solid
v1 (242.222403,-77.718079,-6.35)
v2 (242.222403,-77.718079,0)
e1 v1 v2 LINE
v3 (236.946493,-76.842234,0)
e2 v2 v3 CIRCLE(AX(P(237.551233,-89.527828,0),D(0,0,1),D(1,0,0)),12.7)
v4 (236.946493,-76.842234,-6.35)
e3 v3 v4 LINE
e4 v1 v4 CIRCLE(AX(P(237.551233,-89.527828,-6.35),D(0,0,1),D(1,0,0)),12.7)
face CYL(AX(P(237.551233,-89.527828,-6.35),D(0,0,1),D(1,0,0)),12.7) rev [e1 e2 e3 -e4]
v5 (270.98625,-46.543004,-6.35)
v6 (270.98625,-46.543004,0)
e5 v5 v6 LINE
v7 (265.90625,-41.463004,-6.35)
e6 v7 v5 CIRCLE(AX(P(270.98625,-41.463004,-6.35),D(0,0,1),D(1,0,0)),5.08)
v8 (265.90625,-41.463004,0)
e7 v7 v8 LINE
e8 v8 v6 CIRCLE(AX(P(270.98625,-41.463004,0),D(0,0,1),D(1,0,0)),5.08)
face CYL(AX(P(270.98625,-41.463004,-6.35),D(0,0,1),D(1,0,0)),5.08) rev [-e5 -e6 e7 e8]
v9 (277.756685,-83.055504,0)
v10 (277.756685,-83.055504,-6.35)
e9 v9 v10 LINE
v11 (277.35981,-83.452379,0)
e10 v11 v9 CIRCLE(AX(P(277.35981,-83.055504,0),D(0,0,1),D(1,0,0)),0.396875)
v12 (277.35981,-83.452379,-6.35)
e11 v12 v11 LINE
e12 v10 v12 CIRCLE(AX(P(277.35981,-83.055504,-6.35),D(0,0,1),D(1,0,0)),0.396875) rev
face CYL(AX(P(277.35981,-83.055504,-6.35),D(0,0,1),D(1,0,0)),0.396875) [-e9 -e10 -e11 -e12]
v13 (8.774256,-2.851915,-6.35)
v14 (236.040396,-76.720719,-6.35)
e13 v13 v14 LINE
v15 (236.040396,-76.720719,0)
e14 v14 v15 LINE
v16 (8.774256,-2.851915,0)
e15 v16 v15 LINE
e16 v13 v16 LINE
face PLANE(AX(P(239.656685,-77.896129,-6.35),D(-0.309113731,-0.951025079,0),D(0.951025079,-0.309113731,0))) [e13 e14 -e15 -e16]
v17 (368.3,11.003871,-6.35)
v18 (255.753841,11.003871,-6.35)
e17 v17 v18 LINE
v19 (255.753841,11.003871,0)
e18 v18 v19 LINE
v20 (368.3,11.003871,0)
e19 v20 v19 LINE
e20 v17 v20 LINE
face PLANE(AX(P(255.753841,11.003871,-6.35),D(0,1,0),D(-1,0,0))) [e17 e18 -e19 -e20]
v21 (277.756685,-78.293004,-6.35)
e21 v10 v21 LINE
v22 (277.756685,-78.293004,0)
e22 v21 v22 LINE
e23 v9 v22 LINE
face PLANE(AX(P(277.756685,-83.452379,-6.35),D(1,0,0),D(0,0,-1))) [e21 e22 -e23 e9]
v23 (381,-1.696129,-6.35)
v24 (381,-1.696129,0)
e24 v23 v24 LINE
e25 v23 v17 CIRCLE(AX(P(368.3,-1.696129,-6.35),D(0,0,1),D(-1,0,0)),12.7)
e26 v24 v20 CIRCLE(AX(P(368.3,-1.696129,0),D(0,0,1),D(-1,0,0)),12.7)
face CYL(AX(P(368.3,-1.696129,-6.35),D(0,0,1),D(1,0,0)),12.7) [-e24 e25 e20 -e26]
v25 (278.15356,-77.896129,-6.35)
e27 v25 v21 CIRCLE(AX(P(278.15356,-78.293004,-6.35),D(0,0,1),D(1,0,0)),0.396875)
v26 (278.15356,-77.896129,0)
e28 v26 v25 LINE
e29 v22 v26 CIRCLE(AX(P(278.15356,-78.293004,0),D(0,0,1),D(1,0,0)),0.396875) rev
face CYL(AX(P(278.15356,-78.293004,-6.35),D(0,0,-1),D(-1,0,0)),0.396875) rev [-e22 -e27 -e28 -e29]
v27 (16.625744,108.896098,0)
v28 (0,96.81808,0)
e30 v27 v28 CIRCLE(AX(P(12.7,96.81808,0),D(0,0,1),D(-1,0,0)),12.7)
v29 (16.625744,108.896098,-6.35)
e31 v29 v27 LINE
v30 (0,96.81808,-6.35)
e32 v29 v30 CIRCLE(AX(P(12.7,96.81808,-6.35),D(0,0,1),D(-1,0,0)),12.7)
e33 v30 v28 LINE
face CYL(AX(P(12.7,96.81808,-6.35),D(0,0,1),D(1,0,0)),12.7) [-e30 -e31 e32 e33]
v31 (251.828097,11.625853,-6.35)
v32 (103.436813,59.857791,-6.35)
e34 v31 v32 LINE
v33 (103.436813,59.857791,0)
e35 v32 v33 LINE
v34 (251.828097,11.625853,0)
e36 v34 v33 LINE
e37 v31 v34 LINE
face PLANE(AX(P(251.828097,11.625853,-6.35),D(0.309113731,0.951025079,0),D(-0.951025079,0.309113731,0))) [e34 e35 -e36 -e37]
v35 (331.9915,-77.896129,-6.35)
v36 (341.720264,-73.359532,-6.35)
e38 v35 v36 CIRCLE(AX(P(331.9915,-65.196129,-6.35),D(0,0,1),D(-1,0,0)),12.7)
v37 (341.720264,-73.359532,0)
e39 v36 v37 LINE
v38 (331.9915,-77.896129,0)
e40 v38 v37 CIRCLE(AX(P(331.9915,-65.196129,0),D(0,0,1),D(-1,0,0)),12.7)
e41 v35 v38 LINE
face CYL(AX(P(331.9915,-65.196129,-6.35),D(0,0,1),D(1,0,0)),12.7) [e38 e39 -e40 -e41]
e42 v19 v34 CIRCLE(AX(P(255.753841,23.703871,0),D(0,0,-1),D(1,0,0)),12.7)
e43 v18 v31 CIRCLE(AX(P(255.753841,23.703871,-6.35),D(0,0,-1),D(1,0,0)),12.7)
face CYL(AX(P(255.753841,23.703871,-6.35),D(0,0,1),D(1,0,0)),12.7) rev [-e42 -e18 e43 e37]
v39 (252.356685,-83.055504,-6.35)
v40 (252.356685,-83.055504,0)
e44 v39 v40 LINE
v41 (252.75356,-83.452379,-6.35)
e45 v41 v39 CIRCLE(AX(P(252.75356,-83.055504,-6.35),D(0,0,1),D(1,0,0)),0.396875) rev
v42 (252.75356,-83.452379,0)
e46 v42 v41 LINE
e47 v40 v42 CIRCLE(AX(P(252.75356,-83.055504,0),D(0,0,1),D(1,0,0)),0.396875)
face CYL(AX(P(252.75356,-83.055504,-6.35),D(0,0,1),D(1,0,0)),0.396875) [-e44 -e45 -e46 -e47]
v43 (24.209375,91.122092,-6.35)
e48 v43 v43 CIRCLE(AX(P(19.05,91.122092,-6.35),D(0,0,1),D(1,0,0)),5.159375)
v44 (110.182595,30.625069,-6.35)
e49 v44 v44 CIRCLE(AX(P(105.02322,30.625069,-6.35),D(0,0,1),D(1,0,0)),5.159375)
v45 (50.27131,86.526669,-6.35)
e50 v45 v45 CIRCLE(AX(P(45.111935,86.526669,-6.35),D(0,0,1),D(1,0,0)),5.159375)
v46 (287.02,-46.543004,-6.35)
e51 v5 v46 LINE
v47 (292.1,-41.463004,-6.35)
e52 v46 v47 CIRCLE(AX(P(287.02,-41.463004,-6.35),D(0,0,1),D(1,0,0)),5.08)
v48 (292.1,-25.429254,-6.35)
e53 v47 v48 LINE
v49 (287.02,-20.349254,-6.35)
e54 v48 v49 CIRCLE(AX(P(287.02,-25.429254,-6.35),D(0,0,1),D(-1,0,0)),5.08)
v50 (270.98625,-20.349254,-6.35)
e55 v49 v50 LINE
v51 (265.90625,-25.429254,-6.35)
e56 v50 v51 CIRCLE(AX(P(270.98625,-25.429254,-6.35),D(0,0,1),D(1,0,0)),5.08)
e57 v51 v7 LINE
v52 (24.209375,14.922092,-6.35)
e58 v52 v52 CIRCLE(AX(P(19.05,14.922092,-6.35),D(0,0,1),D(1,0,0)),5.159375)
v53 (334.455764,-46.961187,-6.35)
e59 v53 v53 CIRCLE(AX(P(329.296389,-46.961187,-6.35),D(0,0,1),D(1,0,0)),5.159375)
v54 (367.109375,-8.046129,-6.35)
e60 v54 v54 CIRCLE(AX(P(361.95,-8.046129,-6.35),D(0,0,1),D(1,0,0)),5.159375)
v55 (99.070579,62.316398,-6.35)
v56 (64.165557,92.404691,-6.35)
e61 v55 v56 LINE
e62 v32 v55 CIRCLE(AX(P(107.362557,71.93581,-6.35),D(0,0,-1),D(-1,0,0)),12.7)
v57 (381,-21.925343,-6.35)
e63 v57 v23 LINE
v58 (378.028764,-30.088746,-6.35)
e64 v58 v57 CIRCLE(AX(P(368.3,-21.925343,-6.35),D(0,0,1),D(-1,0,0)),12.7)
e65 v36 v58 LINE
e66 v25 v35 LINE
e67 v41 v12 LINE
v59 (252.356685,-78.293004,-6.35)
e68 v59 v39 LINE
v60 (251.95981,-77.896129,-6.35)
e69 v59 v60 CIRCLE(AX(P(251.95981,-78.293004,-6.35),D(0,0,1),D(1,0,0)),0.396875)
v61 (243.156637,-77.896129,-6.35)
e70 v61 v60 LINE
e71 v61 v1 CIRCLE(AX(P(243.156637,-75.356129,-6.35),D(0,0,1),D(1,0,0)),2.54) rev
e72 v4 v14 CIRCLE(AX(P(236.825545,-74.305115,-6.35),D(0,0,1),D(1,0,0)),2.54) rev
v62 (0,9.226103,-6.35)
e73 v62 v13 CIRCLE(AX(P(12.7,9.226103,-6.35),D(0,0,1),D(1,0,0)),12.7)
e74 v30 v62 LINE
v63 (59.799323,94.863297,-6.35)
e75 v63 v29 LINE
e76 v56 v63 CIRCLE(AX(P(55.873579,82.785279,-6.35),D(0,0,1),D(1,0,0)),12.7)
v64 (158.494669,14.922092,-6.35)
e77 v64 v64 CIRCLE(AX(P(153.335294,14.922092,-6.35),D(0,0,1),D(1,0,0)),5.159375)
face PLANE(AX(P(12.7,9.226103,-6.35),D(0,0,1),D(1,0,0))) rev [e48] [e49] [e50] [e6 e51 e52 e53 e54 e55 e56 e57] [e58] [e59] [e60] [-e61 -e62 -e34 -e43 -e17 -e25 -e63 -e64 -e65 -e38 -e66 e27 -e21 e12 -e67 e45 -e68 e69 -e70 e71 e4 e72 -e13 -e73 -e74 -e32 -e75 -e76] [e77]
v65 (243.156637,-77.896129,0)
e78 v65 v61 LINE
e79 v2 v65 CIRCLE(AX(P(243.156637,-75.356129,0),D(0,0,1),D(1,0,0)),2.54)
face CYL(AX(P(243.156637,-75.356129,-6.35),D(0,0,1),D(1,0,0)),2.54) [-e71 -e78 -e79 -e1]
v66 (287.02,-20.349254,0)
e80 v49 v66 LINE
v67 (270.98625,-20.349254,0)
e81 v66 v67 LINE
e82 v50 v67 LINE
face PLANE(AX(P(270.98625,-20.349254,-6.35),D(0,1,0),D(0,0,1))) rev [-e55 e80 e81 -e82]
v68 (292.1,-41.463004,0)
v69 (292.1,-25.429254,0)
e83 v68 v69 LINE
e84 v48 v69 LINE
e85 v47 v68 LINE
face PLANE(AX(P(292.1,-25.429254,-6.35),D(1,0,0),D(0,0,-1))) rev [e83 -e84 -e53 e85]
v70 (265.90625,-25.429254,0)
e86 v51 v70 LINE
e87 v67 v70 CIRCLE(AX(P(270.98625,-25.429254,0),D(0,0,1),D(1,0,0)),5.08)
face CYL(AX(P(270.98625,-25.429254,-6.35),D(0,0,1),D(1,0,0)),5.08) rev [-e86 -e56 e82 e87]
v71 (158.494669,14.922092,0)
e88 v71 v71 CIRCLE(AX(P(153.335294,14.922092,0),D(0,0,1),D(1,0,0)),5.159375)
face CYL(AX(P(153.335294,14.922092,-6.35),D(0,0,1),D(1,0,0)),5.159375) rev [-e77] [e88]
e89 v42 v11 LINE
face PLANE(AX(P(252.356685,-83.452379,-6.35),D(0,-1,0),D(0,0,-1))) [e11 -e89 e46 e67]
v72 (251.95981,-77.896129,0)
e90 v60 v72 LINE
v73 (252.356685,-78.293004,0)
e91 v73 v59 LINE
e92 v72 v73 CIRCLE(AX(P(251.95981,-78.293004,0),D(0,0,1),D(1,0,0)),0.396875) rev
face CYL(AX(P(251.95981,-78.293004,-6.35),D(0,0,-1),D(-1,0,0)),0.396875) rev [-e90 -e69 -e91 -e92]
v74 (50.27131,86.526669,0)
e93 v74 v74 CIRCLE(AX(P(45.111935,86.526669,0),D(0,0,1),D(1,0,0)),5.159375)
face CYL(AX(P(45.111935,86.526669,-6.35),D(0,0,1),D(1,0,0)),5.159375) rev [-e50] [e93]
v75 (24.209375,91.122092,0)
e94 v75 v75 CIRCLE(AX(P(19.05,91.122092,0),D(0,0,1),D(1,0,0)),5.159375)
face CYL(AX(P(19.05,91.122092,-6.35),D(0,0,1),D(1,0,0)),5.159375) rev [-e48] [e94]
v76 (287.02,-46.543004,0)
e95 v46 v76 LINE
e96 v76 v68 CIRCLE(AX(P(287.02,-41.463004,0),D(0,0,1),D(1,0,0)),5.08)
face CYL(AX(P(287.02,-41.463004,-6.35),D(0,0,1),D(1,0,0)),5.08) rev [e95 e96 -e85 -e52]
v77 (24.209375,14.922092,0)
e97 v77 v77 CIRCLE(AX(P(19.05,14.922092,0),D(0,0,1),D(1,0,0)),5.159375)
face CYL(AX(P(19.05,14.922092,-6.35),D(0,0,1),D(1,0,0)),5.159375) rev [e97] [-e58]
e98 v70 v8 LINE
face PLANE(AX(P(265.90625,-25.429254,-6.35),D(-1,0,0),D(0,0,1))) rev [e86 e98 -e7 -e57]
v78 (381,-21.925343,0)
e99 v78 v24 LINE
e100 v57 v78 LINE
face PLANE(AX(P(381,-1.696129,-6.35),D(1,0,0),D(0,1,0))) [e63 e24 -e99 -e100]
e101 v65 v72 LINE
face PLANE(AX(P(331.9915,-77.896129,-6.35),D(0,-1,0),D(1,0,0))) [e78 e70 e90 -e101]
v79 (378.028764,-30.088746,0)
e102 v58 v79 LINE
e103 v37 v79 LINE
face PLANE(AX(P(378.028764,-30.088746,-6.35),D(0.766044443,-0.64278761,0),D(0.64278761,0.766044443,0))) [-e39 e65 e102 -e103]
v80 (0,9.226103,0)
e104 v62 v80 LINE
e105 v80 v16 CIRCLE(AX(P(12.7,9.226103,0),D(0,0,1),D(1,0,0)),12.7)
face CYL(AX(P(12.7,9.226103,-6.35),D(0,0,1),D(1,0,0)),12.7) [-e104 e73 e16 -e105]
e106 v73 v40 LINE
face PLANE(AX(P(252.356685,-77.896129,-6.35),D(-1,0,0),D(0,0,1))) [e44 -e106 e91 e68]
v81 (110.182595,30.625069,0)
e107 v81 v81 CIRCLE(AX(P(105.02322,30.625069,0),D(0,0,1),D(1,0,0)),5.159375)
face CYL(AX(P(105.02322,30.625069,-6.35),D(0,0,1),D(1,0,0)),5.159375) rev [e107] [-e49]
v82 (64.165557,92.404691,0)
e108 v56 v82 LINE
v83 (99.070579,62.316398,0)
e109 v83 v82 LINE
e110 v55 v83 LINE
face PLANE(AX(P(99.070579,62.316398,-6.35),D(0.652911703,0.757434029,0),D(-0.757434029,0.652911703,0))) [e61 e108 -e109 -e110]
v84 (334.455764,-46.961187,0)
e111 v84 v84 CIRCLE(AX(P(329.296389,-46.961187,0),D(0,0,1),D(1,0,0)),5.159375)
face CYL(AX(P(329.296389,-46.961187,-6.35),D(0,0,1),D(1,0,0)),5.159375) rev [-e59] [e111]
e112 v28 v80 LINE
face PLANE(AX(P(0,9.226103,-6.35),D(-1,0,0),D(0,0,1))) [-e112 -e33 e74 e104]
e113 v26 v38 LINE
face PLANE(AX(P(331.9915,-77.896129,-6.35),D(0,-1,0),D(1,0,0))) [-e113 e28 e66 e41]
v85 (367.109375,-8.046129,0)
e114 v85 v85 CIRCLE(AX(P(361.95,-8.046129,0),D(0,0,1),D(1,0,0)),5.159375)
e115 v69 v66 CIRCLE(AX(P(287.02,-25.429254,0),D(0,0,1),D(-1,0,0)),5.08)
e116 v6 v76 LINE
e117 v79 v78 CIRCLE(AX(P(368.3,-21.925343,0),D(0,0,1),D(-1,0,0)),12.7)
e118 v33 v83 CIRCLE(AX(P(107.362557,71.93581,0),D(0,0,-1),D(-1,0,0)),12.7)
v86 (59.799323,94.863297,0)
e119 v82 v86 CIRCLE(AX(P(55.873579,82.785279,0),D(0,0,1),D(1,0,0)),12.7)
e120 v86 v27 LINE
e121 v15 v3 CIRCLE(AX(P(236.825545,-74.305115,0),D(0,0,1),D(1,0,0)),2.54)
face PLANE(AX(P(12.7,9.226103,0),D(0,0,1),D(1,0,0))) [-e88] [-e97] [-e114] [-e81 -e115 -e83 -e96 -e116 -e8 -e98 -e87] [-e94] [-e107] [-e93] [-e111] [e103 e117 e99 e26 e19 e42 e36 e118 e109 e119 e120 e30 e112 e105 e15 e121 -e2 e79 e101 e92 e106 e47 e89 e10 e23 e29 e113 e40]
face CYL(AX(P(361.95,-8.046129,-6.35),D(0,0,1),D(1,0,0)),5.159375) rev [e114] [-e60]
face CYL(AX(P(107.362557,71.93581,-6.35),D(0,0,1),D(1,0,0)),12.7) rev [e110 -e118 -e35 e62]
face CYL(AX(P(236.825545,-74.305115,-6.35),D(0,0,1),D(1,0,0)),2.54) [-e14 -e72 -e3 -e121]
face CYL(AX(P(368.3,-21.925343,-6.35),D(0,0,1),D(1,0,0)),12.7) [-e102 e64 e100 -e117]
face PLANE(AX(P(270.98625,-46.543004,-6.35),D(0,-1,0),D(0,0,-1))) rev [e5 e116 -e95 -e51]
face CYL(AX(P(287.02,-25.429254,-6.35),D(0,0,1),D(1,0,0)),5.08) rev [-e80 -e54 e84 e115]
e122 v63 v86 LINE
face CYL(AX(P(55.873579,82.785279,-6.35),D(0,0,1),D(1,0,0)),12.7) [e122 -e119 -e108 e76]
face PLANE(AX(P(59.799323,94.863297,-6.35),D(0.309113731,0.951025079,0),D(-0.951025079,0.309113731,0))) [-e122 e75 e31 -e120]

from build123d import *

# Parameters (mm, degrees)
BASE_FLANGE1_DEPTH = 6.35
SKETCH7_W          = 25.4
SKETCH7_H          = 5.55625
TAB1_DEPTH         = 6.35
SKETCH10_R         = 5.159375
CUT_EXTRUDE1_DEPTH = 397.478917898
CUT_EXTRUDE2_DEPTH = 397.478917898
SKETCH12_R         = 12.7
CUT_EXTRUDE4_DEPTH = 397.478917898
FILLET1_R          = 2.54
FILLET2_R          = 0.396875


# Sheet-metal steps are written as plain solids
with BuildPart() as part:
    # Sketch2 → Base-Flange1 (new body)
    with BuildSketch(Plane.XY):
        with BuildLine():
            Line((0, 9.226103289), (0, 96.818079958))
            ThreePointArc((0, 96.818079958), (5.235649853, 107.092975426), (16.62574439, 108.896098462))
            Line((16.62574439, 108.896098462), (59.799322894, 94.863297175))
            ThreePointArc((59.799322894, 94.863297175), (62.104900611, 93.851471549), (64.16555713, 92.40469084))
            Line((64.16555713, 92.40469084), (99.070578742, 62.316397702))
            ThreePointArc((99.070578742, 62.316397702), (101.131235261, 60.869616993), (103.436812978, 59.857791367))
            Line((103.436812978, 59.857791367), (251.828096727, 11.625852535))
            ThreePointArc((251.828096727, 11.625852535), (253.766485462, 11.160330172), (255.753841117, 11.003871039))
            Line((255.753841117, 11.003871039), (368.3, 11.003871039))
            ThreePointArc((368.3, 11.003871039), (377.280256121, 7.28412716), (381, -1.696128961))
            Line((381, -1.696128961), (381, -21.925343231))
            ThreePointArc((381, -21.925343231), (380.234096284, -26.268999051), (378.028764428, -30.088745874))
            Line((378.028764428, -30.088745874), (341.720264081, -73.359531604))
            ThreePointArc((341.720264081, -73.359531604), (337.358751578, -76.706237856), (331.991499654, -77.896128961))
            Line((331.991499654, -77.896128961), (239.656685085, -77.896128961))
            Line((239.656685085, -77.896128961), (8.77425561, -2.851915215))
            ThreePointArc((8.77425561, -2.851915215), (2.425104532, 1.761753142), (0, 9.226103289))
        make_face()
    extrude(amount=-BASE_FLANGE1_DEPTH)

    # Sketch7 → Tab1 (add)
    with BuildSketch(Plane.XY):
        with Locations((265.056685085, -80.674253961)):
            Rectangle(SKETCH7_W, SKETCH7_H)
    extrude(amount=-TAB1_DEPTH)

    # Sketch10 → Cut-Extrude1 (cut, through all)
    with BuildSketch(Plane.XY):
        with Locations((361.95, -8.046128961)):
            Circle(SKETCH10_R)
        with Locations((329.296389428, -46.961186671)):
            Circle(SKETCH10_R)
        with Locations((19.05, 91.122091624)):
            Circle(SKETCH10_R)
        with Locations((19.05, 14.922091624)):
            Circle(SKETCH10_R)
        with Locations((45.111934921, 86.526669328)):
            Circle(SKETCH10_R)
        with Locations((153.335293858, 14.922091624)):
            Circle(SKETCH10_R)
        with Locations((105.023219841, 30.625069183)):
            Circle(SKETCH10_R)
    extrude(amount=-CUT_EXTRUDE1_DEPTH, mode=Mode.SUBTRACT)

    # Sketch11 → Cut-Extrude2 (cut, through all)
    with BuildSketch(Plane.XY):
        with BuildLine():
            Line((270.98625, -20.349253961), (287.02, -20.349253961))
            ThreePointArc((287.02, -20.349253961), (290.612102448, -21.837151512), (292.1, -25.429253961))
            Line((292.1, -25.429253961), (292.1, -41.463003961))
            ThreePointArc((292.1, -41.463003961), (290.612102448, -45.055106409), (287.02, -46.543003961))
            Line((287.02, -46.543003961), (270.98625, -46.543003961))
            ThreePointArc((270.98625, -46.543003961), (267.394147552, -45.055106409), (265.90625, -41.463003961))
            Line((265.90625, -41.463003961), (265.90625, -25.429253961))
            ThreePointArc((265.90625, -25.429253961), (267.394147552, -21.837151512), (270.98625, -20.349253961))
        make_face()
    extrude(amount=-CUT_EXTRUDE2_DEPTH, mode=Mode.SUBTRACT)

    # Sketch12 → Cut-Extrude4 (cut, through all)
    with BuildSketch(Plane.XY):
        with Locations((237.551232799, -89.527827626)):
            Circle(SKETCH12_R)
    extrude(amount=-CUT_EXTRUDE4_DEPTH, mode=Mode.SUBTRACT)

    # Fillet1
    fillet1_edges = [part.edges().sort_by_distance(p)[0] for p in [
        (236.503199055, -76.871144598, -3.175),
        (242.649623344, -77.896128961, -3.175),
    ]]
    fillet(fillet1_edges, radius=FILLET1_R)

    # Fillet2
    fillet2_edges = [part.edges().sort_by_distance(p)[0] for p in [
        (252.356685085, -77.896128961, -3.175),
        (277.756685085, -77.896128961, -3.175),
        (277.756685085, -83.452378961, -3.175),
        (252.356685085, -83.452378961, -3.175),
    ]]
    fillet(fillet2_edges, radius=FILLET2_R)


solid = part.part
